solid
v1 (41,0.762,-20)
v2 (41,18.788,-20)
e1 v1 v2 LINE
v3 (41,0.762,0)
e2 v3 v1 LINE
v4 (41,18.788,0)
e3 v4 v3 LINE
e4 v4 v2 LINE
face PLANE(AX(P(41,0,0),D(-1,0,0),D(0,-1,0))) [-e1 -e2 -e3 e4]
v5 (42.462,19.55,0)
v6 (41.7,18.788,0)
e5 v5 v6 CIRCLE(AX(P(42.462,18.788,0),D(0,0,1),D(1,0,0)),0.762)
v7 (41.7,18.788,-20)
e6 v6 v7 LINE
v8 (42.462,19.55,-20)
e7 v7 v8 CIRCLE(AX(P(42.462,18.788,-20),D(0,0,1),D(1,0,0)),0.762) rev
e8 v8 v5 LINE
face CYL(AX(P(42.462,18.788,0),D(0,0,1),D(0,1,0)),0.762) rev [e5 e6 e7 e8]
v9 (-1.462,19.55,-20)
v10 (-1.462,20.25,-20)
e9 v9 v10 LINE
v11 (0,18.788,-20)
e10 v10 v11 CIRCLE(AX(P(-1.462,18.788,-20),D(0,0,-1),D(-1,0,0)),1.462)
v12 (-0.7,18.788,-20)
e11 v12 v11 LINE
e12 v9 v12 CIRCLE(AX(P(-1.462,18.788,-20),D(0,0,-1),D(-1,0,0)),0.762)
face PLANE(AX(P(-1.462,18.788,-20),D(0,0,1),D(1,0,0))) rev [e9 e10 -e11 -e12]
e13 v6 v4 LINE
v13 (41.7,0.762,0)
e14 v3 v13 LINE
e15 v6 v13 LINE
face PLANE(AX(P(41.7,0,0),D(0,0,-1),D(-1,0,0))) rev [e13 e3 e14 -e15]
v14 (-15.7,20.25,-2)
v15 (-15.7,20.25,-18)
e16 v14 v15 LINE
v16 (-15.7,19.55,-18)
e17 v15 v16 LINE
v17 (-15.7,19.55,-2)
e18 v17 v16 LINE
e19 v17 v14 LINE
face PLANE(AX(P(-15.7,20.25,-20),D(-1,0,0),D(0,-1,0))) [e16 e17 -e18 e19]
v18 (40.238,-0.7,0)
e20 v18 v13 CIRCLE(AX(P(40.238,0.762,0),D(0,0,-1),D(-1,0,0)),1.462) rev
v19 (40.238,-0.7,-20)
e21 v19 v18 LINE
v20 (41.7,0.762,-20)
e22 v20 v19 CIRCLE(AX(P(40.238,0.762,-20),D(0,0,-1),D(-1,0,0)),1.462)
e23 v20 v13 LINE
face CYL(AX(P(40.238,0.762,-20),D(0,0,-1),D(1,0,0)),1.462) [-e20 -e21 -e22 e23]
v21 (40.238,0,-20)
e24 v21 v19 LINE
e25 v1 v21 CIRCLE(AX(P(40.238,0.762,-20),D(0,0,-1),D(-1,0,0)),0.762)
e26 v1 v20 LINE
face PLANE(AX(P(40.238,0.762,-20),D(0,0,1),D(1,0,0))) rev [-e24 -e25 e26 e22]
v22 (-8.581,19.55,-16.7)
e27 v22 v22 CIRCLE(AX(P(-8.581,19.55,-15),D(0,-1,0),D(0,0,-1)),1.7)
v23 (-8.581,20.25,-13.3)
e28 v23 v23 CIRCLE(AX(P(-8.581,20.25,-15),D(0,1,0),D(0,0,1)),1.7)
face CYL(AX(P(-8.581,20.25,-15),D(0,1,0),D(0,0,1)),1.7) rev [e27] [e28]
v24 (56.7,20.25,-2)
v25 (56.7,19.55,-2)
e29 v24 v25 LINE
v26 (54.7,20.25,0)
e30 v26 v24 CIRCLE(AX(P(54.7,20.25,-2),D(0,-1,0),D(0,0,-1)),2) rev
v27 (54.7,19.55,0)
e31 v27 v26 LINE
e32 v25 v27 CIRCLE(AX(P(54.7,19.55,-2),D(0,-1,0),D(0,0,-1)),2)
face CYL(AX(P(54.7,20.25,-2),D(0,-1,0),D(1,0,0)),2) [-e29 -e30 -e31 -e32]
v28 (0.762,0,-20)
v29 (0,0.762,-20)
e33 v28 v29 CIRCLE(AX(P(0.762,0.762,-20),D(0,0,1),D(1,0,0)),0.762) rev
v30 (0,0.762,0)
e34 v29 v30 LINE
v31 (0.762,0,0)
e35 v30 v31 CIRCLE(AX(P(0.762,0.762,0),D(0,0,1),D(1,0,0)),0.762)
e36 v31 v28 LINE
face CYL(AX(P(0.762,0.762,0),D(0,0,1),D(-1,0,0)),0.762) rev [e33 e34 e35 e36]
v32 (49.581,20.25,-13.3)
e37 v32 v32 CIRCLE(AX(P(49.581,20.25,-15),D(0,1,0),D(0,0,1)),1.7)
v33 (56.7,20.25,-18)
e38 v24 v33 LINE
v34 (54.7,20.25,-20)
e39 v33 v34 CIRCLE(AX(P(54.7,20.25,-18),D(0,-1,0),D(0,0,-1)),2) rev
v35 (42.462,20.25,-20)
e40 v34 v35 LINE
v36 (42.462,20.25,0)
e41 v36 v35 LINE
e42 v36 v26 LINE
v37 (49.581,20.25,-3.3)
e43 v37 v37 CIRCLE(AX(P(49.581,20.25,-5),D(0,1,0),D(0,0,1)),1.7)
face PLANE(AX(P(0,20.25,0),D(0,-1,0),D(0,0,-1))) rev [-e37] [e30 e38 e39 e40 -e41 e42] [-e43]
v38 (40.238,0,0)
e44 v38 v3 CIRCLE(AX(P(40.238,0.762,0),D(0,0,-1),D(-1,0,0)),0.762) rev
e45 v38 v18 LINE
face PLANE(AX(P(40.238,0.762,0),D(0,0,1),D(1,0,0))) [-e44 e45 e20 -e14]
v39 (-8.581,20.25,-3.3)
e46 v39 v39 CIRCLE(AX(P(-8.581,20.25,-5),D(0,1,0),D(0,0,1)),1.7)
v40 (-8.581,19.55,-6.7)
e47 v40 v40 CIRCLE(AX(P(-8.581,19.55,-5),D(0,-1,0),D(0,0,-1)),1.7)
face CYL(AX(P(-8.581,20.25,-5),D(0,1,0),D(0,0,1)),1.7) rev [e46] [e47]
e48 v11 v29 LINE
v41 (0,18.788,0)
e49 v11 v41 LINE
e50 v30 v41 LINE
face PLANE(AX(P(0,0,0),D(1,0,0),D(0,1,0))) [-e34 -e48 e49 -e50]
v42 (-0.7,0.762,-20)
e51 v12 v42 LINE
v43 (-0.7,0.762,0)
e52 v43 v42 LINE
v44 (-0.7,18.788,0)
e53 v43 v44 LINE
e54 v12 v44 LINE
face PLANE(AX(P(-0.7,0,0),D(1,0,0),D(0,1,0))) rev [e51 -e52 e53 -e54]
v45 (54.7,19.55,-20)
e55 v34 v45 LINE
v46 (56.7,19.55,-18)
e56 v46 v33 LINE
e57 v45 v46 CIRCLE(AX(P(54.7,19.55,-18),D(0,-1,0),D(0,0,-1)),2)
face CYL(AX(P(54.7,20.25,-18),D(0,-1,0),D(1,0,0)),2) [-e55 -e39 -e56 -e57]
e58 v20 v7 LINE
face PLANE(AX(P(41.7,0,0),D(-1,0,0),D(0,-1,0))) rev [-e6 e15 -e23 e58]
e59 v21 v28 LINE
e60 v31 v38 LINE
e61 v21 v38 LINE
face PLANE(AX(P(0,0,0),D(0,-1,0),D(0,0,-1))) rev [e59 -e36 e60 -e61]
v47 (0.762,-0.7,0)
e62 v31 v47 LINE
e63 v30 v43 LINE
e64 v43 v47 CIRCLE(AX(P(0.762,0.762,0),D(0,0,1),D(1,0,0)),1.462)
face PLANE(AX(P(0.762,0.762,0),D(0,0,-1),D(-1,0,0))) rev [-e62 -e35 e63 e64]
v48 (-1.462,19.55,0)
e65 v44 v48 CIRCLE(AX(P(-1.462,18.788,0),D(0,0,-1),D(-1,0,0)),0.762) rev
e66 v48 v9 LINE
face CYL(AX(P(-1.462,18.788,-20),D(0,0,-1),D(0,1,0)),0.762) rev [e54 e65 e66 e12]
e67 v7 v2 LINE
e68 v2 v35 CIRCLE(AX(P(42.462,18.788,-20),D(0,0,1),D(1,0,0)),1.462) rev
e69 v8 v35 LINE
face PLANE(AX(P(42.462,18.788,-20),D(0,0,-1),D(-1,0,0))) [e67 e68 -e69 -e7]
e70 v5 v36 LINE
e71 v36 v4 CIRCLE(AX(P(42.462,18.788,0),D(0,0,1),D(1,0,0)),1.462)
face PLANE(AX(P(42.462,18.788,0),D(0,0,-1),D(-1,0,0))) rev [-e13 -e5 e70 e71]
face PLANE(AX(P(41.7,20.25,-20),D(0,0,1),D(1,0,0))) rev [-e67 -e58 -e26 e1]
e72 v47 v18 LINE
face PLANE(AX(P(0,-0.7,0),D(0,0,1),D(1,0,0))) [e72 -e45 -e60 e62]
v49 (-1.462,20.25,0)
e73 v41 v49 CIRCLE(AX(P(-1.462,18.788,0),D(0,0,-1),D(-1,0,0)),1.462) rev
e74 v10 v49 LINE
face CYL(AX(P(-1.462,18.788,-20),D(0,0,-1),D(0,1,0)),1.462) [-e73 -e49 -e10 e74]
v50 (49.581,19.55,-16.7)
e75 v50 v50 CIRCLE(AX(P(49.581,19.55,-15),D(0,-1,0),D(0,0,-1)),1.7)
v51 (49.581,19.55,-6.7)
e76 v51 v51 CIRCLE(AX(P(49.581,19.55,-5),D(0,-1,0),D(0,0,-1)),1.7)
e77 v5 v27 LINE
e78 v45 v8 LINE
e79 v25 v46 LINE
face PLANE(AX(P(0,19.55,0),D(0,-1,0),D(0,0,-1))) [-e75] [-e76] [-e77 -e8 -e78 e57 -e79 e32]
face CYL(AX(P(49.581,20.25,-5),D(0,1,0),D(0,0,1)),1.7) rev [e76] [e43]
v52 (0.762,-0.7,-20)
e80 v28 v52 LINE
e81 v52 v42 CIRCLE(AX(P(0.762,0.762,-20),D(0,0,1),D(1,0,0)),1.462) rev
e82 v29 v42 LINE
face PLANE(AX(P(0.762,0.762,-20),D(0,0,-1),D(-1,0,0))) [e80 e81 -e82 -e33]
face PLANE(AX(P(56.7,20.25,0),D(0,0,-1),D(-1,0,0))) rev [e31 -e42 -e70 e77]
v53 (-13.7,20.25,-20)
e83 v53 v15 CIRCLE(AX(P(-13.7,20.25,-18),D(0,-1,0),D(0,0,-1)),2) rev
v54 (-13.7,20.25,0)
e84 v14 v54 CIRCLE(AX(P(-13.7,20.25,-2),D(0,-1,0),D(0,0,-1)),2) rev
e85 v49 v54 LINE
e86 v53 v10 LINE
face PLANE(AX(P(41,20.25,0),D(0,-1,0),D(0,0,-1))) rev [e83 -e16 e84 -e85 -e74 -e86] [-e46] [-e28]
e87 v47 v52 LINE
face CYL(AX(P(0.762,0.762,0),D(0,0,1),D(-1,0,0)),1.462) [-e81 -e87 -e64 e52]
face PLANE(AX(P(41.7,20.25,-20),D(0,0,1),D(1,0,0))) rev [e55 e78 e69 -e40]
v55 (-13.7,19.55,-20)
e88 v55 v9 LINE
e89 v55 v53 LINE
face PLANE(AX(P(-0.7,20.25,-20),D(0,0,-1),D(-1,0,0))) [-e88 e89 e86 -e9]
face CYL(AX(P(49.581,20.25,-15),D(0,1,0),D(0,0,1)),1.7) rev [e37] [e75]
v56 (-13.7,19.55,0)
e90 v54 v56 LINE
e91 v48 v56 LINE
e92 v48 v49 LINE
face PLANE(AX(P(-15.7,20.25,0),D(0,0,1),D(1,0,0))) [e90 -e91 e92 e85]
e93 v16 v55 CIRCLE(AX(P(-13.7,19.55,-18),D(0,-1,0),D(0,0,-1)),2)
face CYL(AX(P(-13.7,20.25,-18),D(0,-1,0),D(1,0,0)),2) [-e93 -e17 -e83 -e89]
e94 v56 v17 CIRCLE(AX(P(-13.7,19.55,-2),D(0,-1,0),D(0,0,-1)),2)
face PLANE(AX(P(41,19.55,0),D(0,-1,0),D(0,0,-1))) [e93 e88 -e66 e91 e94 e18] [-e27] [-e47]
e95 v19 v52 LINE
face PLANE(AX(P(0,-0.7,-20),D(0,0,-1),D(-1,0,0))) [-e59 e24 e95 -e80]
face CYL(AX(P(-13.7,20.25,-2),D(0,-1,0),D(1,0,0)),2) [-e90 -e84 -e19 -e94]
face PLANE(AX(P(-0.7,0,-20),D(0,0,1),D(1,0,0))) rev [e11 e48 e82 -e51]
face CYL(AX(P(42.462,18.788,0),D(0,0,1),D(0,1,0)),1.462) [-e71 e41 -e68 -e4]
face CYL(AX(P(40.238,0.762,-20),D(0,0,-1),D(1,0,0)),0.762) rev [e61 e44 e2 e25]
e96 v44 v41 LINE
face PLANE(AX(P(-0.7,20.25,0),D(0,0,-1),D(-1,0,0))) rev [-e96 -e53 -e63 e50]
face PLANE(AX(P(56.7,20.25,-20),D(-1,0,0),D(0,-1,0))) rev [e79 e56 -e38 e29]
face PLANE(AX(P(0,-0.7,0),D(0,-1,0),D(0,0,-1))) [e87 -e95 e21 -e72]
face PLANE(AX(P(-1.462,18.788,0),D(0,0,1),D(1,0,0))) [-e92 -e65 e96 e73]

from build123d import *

# Parameters (mm, degrees)
SKETCH1_W                    = 41
SKETCH1_H                    = 20
BASE_FLANGE1_DEPTH           = 0.7
EDGE_FLANGE1_STRIP_W         = 4.324
EDGE_FLANGE1_STRIP_H         = 0.7
EDGE_FLANGE1_STRIP_CUT_DEPTH = 20
EDGE_FLANGE1_DEPTH           = 20
EDGE_FLANGE2_STRIP_W         = 4.324
EDGE_FLANGE2_STRIP_H         = 0.7
EDGE_FLANGE2_STRIP_CUT_DEPTH = 20
EDGE_FLANGE2_DEPTH           = 20
EDGE_FLANGE3_STRIP_W         = 4.324
EDGE_FLANGE3_STRIP_H         = 0.7
EDGE_FLANGE3_STRIP_CUT_DEPTH = 20
EDGE_FLANGE3_DEPTH           = 20
M3_CLEARANCE_HOLE1_D         = 3.4
M3_CLEARANCE_HOLE1_DEPTH     = 3
M3_CLEARANCE_HOLE1_TIP       = 1.021463052
FILLET1_R                    = 2


# Sheet-metal steps are written as plain solids
with BuildPart() as part:
    # Sketch1 → Base-Flange1 (new body)
    with BuildSketch(Plane(origin=(0, 0, 0), x_dir=(1, 0, 0), z_dir=(0, 1, 0))):
        with Locations((20.5, 10)):
            Rectangle(SKETCH1_W, SKETCH1_H)
    extrude(amount=-BASE_FLANGE1_DEPTH)

    # Edge-Flange1 strip (across the edge) → Edge-Flange1 strip cut (cut)
    with BuildSketch(Plane(origin=(41, 0, 0), x_dir=(-1, 0, 0), z_dir=(0, 0, -1))):
        with Locations((-1.4, -0.35)):
            Rectangle(EDGE_FLANGE1_STRIP_W, EDGE_FLANGE1_STRIP_H)
    extrude(amount=EDGE_FLANGE1_STRIP_CUT_DEPTH, mode=Mode.SUBTRACT)

    # Edge-Flange1 section (across the edge) → Edge-Flange1 (add)
    with BuildSketch(Plane(origin=(41, 0, 0), x_dir=(-1, 0, 0), z_dir=(0, 0, -1))):
        with BuildLine():
            Line((-0.7, 0.762), (-0.7, 20.25))
            Line((-0.7, 20.25), (0, 20.25))
            Line((0, 20.25), (0, 0.762))
            ThreePointArc((0, 0.762), (0.223184633, 0.223184633), (0.762, 0))
            Line((0.762, 0), (0.762, -0.7))
            ThreePointArc((0.762, -0.7), (-0.271790114, -0.271790114), (-0.7, 0.762))
        make_face()
    extrude(amount=EDGE_FLANGE1_DEPTH)

    # Edge-Flange2 strip (across the edge) → Edge-Flange2 strip cut (cut)
    with BuildSketch(Plane(origin=(41.7, 20.25, -20), x_dir=(0, -1, 0), z_dir=(0, 0, 1))):
        with Locations((-0.7, -0.35)):
            Rectangle(EDGE_FLANGE2_STRIP_W, EDGE_FLANGE2_STRIP_H)
    edge_flange2_strip_cut = extrude(amount=EDGE_FLANGE2_STRIP_CUT_DEPTH, mode=Mode.SUBTRACT)

    # Edge-Flange2 section (across the edge) → Edge-Flange2 (add)
    with BuildSketch(Plane(origin=(41.7, 20.25, -20), x_dir=(0, -1, 0), z_dir=(0, 0, 1))):
        with BuildLine():
            Line((0, 0.762), (0, 15))
            Line((0, 15), (0.7, 15))
            Line((0.7, 15), (0.7, 0.762))
            ThreePointArc((0.7, 0.762), (0.923184633, 0.223184633), (1.462, 0))
            Line((1.462, 0), (1.462, -0.7))
            ThreePointArc((1.462, -0.7), (0.428209886, -0.271790114), (0, 0.762))
        make_face()
    edge_flange2 = extrude(amount=EDGE_FLANGE2_DEPTH)

    # Edge-Flange3 strip (across the edge) → Edge-Flange3 strip cut (cut)
    with BuildSketch(Plane.XY.offset(-20)):
        with Locations((-1.4, -0.35)):
            Rectangle(EDGE_FLANGE3_STRIP_W, EDGE_FLANGE3_STRIP_H)
    extrude(amount=EDGE_FLANGE3_STRIP_CUT_DEPTH, mode=Mode.SUBTRACT)

    # Edge-Flange3 section (across the edge) → Edge-Flange3 (add)
    with BuildSketch(Plane.XY.offset(-20)):
        with BuildLine():
            Line((-0.7, 0.762), (-0.7, 20.25))
            Line((-0.7, 20.25), (0, 20.25))
            Line((0, 20.25), (0, 0.762))
            ThreePointArc((0, 0.762), (0.223184633, 0.223184633), (0.762, 0))
            Line((0.762, 0), (0.762, -0.7))
            ThreePointArc((0.762, -0.7), (-0.271790114, -0.271790114), (-0.7, 0.762))
        make_face()
    extrude(amount=EDGE_FLANGE3_DEPTH)

    # Mirror2: Edge-Flange2 strip cut, Edge-Flange2 across plane
    add(edge_flange2_strip_cut.mirror(Plane(origin=(20.5, 0, 0), x_dir=(0, 0, 1), z_dir=(1, 0, 0))), mode=Mode.SUBTRACT)
    add(edge_flange2.mirror(Plane(origin=(20.5, 0, 0), x_dir=(0, 0, 1), z_dir=(1, 0, 0))))

    # M3 Clearance Hole1
    with Locations(Plane(origin=(0, 20.25, 0), x_dir=(1, 0, 0), z_dir=(0, 1, 0))):
        with Locations((49.581, 5), (49.581, 15), (-8.581, 15), (-8.581, 5)):
            Hole(M3_CLEARANCE_HOLE1_D / 2, depth=M3_CLEARANCE_HOLE1_DEPTH)
            with Locations((0, 0, -(M3_CLEARANCE_HOLE1_DEPTH + M3_CLEARANCE_HOLE1_TIP / 2))):  # 118° drill point
                Cone(0, M3_CLEARANCE_HOLE1_D / 2, M3_CLEARANCE_HOLE1_TIP, mode=Mode.SUBTRACT)

    # Fillet1
    fillet1_edges = [part.edges().sort_by_distance(p)[0] for p in [
        (-15.7, 19.9, 0),
        (-15.7, 19.9, -20),
        (56.7, 19.9, -20),
        (56.7, 19.9, 0),
    ]]
    fillet(fillet1_edges, radius=FILLET1_R)


solid = part.part
